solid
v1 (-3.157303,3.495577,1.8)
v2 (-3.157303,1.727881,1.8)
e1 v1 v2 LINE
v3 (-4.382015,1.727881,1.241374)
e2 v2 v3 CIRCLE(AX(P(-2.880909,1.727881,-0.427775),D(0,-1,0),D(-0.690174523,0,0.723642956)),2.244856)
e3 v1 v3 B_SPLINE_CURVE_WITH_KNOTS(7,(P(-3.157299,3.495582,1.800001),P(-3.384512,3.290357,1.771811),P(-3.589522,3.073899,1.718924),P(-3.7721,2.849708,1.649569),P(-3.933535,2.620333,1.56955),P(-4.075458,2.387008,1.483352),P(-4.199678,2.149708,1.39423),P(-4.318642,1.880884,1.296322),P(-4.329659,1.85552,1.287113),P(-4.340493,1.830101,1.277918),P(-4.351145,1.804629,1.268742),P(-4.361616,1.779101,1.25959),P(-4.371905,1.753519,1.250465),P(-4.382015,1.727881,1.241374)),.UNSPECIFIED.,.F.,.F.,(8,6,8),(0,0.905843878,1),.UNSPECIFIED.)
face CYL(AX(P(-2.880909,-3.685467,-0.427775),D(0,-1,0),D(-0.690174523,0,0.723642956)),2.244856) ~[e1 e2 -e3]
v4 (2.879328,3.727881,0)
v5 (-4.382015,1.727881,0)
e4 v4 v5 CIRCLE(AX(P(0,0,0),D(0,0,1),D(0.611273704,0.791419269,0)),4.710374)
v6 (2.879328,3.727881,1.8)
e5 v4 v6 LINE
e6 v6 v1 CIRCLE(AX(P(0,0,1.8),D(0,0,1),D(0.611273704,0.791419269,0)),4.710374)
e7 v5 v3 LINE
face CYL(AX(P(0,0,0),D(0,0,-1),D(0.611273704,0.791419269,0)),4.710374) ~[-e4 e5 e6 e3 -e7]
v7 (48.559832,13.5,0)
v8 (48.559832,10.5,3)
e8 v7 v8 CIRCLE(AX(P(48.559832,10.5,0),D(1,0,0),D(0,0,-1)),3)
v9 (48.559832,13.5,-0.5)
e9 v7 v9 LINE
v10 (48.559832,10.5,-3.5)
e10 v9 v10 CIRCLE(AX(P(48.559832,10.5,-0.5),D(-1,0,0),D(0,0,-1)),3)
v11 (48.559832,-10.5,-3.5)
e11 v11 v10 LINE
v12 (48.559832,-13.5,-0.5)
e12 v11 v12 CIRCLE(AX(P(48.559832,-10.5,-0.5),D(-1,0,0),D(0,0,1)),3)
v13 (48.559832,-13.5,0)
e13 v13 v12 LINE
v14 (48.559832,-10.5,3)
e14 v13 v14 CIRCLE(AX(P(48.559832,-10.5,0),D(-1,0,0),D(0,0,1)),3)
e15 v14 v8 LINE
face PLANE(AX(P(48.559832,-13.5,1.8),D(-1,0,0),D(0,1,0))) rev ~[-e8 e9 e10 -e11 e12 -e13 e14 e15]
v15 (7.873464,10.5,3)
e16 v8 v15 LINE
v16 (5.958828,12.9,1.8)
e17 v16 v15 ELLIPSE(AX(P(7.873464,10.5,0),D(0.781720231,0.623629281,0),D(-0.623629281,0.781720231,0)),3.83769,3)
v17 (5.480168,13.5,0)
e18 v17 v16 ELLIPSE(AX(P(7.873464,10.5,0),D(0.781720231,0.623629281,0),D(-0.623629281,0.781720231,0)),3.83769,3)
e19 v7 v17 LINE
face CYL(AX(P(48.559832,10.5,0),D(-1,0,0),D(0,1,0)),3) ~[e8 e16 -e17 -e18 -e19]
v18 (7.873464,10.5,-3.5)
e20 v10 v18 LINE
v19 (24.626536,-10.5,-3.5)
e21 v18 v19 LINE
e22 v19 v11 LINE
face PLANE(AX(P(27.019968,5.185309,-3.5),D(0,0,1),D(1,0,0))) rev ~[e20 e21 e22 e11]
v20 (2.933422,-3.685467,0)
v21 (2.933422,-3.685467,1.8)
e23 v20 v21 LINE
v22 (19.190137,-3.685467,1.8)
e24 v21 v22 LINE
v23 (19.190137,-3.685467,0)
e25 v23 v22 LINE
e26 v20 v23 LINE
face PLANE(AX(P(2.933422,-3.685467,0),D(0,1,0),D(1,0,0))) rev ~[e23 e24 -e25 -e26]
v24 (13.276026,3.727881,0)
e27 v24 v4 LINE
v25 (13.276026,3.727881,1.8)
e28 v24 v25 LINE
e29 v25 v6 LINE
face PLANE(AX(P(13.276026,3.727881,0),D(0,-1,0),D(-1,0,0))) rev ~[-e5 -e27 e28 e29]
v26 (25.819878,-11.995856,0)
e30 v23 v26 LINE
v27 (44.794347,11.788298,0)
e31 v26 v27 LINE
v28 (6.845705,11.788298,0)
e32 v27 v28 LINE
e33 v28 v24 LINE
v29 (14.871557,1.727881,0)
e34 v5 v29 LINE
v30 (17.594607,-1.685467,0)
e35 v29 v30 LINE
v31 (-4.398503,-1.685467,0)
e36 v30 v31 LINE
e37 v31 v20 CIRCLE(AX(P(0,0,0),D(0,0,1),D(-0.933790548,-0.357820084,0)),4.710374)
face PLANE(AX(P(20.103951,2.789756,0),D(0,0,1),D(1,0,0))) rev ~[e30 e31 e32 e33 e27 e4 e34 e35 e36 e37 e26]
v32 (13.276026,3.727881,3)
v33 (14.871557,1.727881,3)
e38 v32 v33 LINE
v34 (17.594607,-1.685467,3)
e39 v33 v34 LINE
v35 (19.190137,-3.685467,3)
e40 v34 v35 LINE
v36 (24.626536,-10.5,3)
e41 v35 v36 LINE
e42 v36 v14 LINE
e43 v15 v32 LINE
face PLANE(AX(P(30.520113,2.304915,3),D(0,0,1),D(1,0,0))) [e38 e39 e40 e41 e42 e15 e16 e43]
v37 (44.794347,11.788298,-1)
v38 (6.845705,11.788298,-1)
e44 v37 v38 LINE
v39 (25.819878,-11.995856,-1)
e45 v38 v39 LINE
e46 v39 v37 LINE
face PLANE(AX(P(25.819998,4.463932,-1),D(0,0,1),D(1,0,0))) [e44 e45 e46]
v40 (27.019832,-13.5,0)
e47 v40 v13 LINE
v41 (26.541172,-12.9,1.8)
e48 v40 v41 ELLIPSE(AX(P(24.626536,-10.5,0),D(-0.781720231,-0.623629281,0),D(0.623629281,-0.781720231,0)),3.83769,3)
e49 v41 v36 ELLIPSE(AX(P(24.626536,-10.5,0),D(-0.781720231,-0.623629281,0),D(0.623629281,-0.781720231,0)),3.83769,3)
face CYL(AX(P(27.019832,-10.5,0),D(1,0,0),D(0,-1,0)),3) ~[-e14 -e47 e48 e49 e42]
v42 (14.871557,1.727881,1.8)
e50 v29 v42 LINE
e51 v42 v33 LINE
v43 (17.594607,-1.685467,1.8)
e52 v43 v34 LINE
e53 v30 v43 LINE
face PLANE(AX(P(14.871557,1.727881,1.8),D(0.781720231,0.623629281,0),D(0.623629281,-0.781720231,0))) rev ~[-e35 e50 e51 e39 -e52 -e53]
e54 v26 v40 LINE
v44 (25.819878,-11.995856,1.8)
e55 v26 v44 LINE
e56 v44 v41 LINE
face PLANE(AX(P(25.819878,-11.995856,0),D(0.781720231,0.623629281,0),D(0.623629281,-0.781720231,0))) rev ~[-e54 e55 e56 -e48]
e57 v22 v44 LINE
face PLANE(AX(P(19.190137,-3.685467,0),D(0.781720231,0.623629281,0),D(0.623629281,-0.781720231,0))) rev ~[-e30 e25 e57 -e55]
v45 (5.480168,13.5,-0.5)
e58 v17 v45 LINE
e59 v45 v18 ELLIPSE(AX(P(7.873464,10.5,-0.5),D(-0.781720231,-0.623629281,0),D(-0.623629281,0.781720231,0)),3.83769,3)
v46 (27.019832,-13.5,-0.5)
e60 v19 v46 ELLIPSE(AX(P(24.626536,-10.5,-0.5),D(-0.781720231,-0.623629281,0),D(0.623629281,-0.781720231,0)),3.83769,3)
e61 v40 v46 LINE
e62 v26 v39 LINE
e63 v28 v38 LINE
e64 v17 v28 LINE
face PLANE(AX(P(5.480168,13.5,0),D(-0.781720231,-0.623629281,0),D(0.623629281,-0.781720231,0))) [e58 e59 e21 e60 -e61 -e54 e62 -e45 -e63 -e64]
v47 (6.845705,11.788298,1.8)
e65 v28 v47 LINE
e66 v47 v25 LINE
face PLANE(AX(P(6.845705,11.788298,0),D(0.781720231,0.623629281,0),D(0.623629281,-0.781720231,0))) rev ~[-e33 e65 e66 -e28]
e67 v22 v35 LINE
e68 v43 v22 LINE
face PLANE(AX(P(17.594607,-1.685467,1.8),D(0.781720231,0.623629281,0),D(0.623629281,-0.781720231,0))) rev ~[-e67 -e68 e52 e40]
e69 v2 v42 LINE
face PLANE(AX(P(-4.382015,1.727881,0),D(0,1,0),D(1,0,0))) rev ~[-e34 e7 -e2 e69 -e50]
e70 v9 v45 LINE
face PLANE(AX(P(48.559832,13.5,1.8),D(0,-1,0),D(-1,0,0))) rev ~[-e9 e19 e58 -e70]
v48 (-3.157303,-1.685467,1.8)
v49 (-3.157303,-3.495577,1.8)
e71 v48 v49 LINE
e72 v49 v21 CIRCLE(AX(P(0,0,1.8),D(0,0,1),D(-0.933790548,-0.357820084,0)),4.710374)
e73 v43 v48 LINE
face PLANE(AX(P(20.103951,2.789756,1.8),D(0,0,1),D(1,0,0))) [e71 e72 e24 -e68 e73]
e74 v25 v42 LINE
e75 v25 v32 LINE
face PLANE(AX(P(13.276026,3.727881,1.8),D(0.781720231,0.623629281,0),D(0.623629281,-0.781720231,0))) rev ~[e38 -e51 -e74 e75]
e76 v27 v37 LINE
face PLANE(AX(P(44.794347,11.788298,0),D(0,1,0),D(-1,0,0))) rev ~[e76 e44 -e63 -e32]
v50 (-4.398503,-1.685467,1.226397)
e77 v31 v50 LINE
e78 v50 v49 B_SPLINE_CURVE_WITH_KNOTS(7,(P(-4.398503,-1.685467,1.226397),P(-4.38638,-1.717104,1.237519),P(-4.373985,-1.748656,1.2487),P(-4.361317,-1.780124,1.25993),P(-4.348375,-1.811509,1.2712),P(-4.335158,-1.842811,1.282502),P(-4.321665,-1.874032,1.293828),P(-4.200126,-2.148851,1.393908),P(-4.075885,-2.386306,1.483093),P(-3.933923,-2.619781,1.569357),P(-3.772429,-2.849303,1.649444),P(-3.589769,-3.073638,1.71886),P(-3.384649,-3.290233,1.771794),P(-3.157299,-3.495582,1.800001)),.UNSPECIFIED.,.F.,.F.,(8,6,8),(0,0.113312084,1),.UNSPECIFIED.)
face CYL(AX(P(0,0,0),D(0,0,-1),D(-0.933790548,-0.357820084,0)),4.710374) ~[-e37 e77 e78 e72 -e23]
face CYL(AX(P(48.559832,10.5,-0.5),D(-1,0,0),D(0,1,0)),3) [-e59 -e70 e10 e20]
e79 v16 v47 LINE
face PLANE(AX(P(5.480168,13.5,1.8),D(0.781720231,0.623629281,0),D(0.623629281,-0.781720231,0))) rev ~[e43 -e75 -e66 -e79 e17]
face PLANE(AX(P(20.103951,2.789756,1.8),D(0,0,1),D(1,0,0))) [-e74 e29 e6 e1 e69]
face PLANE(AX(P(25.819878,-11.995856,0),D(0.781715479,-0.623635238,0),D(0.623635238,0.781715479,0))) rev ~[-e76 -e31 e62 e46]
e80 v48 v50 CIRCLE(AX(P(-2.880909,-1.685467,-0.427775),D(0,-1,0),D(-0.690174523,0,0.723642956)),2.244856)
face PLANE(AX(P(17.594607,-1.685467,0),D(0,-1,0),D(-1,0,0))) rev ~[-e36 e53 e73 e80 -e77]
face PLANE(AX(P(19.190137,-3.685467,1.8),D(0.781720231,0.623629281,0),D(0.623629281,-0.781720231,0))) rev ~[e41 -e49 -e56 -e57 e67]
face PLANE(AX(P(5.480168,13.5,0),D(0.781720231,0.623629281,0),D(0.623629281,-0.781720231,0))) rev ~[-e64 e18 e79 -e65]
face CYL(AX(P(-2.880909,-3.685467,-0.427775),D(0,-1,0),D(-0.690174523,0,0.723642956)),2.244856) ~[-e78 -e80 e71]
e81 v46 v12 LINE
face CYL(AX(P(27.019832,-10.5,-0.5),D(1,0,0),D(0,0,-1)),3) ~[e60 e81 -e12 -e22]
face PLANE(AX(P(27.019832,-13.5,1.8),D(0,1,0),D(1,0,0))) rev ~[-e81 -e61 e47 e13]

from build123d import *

# Parameters (mm, degrees)
F2_DEPTH  = 3.5
F4_DEPTH  = 1
F6_DEPTH  = 1.8
F8_DEPTH  = 1.2
F9_R      = 3
F11_DEPTH = 17.1864665007


with BuildPart() as f2:
    # F1 (on Top) → F2 (new body)
    with BuildSketch(Plane.XY):
        Polygon((48.5598316574, 13.5), (5.4801683426, 13.5), (27.0198316574, -13.5), align=None)
        Polygon((48.5598316574, 13.5), (27.0198316574, -13.5), (48.5598316574, -13.5), align=None)
    extrude(amount=-F2_DEPTH)

    # F3 (on Top) → F4 (cut)
    with BuildSketch(Plane.XY):
        Polygon((44.7943471372, 11.7882982132), (6.8457046456, 11.7882982132), (25.8198775993, -11.9958558036), align=None)
    extrude(amount=-F4_DEPTH, mode=Mode.SUBTRACT)

    # F5 (on face) → F6 (join)
    with BuildSketch(Plane.XY):
        with BuildLine():
            ThreePointArc((2.8793278964, 3.7278809202), (3.7658696299, 2.8294612951), (4.3820146982, 1.7278809202))
            Line((4.3820146982, 1.7278809202), (14.8715565456, 1.7278809202))
            Line((14.8715565456, 1.7278809202), (17.594606702, -1.6854665007))
            Line((17.594606702, -1.6854665007), (4.3985029231, -1.6854665007))
            ThreePointArc((4.3985029231, -1.6854665007), (3.7999051439, -2.783585132), (2.9334215452, -3.6854665007))
            Line((2.9334215452, -3.6854665007), (19.1901373179, -3.6854665007))
            Line((19.1901373179, -3.6854665007), (25.8198775993, -11.9958558036))
            Line((25.8198775993, -11.9958558036), (44.7943471372, 11.7882982132))
            Line((44.7943471372, 11.7882982132), (6.8457046456, 11.7882982132))
            Line((6.8457046456, 11.7882982132), (13.2760259297, 3.7278809202))
            Line((13.2760259297, 3.7278809202), (2.8793278964, 3.7278809202))
        make_face()
        Polygon((5.4801683426, 13.5), (6.8457046456, 11.7882982132), (44.7943471372, 11.7882982132), (25.8198775993, -11.9958558036), (27.0198316574, -13.5), (48.5598316574, 13.5), align=None)
        with BuildLine():
            Line((-4.3820146982, 1.7278809202), (4.3820146982, 1.7278809202))
            ThreePointArc((4.3820146982, 1.7278809202), (3.7658696299, 2.8294612951), (2.8793278964, 3.7278809202))
            ThreePointArc((2.8793278964, 3.7278809202), (-1.2508065023, 4.5412672663), (-4.3820146982, 1.7278809202))
        make_face()
        with BuildLine():
            ThreePointArc((2.9334215452, -3.6854665007), (3.7999051439, -2.783585132), (4.3985029231, -1.6854665007))
            Line((4.3985029231, -1.6854665007), (-4.3985029231, -1.6854665007))
            ThreePointArc((-4.3985029231, -1.6854665007), (-1.2396031062, -4.5443381728), (2.9334215452, -3.6854665007))
        make_face()
        Polygon((48.5598316574, 13.5), (27.0198316574, -13.5), (48.5598316574, -13.5), align=None)
    extrude(amount=F6_DEPTH)

    # F7 (on face) → F8 (join)
    with BuildSketch(Plane.XY.offset(1.8)):
        Polygon((48.5598316574, 13.5), (5.4801683426, 13.5), (13.2760259297, 3.7278809202), (14.8715565456, 1.7278809202), (17.594606702, -1.6854665007), (19.1901373179, -3.6854665007), (27.0198316574, -13.5), (48.5598316574, -13.5), align=None)
    extrude(amount=F8_DEPTH)

    # F9
    f9_edges = [f2.edges().sort_by_distance(p)[0] for p in [
        (27.02, 13.5, 3),
        (27.02, 13.5, -3.5),
        (37.789832, -13.5, 3),
        (37.789832, -13.5, -3.5),
    ]]
    fillet(f9_edges, radius=F9_R)

    # F10 (on face) → F11 (cut, through all)
    with BuildSketch(Plane.XZ.offset(3.6854665007)):
        with BuildLine():
            ThreePointArc((-4.430251196, 1.1966986349), (-3.7397455906, 1.6462971281), (-2.9335320779, 1.8164634239))
            Line((-2.9335320779, 1.8164634239), (-4.430251196, 1.8164634239))
            Line((-4.430251196, 1.8164634239), (-4.430251196, 1.1966986349))
        make_face()
    extrude(amount=-F11_DEPTH, mode=Mode.SUBTRACT)


solid = f2.part
